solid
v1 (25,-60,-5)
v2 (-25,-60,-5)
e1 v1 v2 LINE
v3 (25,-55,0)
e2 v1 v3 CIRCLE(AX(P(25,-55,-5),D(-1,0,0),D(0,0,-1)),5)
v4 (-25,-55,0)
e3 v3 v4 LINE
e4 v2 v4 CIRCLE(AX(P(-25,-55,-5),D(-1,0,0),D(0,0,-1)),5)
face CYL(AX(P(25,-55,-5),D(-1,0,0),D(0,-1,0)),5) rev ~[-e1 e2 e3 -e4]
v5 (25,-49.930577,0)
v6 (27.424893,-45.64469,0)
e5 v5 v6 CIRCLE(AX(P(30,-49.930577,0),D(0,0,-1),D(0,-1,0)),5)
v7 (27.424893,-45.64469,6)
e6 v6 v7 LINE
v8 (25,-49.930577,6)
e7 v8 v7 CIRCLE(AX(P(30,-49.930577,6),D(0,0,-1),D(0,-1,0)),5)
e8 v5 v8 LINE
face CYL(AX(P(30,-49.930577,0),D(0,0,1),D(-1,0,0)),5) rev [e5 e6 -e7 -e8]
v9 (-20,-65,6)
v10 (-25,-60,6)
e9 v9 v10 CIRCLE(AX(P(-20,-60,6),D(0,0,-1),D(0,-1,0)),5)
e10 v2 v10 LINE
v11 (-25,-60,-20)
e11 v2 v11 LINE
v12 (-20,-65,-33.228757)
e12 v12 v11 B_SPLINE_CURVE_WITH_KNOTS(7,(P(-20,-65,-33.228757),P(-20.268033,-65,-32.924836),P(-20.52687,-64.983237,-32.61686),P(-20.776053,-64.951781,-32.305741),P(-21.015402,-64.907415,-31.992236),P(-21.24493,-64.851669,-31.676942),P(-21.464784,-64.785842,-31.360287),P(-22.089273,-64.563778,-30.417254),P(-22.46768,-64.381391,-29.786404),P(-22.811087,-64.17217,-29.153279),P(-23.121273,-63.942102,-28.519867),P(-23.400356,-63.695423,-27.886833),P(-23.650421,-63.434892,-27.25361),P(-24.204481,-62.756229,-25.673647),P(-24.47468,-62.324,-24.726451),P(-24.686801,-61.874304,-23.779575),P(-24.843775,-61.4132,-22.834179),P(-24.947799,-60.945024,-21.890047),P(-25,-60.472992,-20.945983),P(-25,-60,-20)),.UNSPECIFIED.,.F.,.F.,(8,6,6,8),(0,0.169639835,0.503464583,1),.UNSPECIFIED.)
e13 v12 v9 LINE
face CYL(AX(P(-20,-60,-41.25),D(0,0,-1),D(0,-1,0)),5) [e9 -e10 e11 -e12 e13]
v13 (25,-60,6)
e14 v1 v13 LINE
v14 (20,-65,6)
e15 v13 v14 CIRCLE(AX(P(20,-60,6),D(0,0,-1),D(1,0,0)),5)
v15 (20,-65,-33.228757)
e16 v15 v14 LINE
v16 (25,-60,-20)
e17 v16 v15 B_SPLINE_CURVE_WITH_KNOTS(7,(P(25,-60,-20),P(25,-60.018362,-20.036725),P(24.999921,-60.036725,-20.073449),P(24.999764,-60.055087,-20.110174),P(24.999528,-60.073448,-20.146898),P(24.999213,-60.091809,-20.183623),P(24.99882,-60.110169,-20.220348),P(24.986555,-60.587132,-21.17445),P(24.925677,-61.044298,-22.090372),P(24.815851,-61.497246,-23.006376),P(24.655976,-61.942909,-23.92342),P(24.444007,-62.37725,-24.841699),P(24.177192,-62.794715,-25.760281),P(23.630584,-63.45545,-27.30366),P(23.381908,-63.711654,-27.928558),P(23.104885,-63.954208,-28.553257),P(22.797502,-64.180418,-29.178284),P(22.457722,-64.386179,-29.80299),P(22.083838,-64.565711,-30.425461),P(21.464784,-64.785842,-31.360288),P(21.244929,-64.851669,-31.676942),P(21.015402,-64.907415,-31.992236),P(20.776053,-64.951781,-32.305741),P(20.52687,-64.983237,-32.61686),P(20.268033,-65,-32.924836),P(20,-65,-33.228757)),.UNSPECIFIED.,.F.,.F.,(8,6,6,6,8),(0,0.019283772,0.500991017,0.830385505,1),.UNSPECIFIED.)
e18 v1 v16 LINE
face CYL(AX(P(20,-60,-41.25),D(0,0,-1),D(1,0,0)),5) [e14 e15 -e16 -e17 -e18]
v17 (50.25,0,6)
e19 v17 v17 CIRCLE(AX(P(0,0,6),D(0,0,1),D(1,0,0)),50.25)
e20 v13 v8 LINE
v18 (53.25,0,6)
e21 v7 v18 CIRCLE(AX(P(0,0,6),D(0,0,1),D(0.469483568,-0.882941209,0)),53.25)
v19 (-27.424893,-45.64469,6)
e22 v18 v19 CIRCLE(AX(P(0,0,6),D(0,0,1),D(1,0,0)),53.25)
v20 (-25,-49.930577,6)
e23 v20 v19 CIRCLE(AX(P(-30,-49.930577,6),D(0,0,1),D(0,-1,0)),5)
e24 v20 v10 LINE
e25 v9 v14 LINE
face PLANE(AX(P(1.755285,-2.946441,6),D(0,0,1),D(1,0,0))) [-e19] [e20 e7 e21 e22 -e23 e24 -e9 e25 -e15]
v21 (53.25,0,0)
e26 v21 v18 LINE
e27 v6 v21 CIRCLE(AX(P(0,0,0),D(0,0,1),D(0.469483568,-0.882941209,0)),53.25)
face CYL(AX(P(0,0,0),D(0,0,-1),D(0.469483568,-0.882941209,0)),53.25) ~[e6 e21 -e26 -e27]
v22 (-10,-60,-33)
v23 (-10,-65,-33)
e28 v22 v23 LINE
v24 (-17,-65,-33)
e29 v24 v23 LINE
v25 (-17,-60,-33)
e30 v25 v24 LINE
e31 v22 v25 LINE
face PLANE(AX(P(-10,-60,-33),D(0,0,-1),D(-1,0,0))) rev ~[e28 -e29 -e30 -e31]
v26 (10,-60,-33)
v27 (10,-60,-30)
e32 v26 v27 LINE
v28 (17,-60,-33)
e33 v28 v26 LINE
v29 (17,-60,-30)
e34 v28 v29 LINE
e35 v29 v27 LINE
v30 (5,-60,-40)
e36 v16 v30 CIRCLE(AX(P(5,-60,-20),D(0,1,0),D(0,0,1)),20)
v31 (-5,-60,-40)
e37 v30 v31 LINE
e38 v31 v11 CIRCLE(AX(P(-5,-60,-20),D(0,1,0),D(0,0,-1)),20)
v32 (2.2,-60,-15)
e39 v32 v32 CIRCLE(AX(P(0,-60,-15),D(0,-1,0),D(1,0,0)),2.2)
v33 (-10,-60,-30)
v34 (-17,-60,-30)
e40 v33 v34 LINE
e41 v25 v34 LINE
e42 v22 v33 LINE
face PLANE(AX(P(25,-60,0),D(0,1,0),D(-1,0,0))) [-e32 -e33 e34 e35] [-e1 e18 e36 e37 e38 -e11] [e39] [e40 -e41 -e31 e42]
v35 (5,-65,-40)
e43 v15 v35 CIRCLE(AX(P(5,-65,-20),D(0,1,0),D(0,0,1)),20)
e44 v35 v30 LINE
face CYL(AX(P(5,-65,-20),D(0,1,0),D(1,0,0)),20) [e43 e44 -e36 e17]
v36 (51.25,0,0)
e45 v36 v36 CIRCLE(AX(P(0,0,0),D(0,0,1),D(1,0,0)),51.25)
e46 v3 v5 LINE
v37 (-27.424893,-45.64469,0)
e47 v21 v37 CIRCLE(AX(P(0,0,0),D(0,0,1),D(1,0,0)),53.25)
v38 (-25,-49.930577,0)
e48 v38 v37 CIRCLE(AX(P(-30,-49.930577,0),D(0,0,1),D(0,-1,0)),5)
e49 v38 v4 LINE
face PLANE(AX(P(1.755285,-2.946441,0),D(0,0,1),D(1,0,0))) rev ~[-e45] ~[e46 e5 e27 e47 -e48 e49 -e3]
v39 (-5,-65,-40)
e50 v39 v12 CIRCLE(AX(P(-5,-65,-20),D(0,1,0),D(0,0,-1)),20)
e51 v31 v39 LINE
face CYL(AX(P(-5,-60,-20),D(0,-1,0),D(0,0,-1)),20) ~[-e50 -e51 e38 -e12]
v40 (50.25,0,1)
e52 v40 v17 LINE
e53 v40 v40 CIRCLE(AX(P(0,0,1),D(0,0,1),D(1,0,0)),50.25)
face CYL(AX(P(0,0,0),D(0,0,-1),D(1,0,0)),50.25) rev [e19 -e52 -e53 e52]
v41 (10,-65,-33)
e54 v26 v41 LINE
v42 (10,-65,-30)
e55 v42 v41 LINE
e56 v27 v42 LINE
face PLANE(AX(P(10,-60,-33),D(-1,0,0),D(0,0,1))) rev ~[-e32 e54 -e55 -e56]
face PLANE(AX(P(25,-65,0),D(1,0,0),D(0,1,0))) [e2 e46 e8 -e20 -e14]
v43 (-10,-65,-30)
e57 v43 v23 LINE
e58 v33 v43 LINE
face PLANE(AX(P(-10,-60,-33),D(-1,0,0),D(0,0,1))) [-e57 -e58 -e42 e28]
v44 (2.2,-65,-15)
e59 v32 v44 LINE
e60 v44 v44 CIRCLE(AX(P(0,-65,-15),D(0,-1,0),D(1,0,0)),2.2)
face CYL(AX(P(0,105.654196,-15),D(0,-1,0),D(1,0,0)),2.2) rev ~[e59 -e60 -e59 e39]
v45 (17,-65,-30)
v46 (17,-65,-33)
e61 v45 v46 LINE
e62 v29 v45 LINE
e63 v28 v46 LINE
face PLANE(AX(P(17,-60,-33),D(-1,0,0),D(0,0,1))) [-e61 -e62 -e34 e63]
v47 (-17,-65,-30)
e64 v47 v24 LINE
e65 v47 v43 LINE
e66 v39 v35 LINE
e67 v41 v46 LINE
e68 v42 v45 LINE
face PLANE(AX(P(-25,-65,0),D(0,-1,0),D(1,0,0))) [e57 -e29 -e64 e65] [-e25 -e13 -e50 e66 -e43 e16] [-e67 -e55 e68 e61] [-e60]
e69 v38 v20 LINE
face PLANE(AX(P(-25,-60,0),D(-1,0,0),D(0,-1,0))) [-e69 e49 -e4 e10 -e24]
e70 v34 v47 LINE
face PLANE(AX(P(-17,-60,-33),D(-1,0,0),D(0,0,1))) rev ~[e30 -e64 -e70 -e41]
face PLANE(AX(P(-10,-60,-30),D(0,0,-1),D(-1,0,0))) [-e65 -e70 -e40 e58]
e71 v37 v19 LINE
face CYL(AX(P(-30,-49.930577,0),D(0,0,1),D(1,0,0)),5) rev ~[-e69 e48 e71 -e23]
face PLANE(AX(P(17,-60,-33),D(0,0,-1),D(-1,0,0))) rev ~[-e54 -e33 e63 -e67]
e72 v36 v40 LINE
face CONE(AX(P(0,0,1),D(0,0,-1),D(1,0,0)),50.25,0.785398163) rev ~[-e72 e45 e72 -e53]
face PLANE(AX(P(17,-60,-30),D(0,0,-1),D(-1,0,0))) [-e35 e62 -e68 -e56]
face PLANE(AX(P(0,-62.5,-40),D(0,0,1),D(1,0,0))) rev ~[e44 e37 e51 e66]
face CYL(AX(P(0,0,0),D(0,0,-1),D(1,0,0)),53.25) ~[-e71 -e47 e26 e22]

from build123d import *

# Parameters (mm, degrees)
F0_R        = 50.25
F1_DEPTH    = 6
F2_DEPTH    = 40
F4_D        = 4.4
F3_W        = 7
F3_H        = 3
F5_DEPTH    = 25
F6_R        = 5
F7_R        = 20
F8_T1_DEPTH = 59.75
F9_SIZE     = 1


# Not quite as in the source:
# - a fillet or chamfer that OpenCascade refuses, or shapes differently, is made with other operations: its cross-section is extruded or revolved along the edge and cut away or added


with BuildPart() as f1:
    # F0 (on Top) → F1 (new body)
    with BuildSketch(Plane.XY):
        with BuildLine():
            ThreePointArc((25, -47.0166194021), (45.6443452138, -27.4254671792), (53.25, 0))
            ThreePointArc((53.25, 0), (-27.4254671792, 45.6443452138), (-25, -47.0166194021))
            ThreePointArc((-25, -47.0166194021), (0, -53.25), (25, -47.0166194021))
        make_face()
        Circle(F0_R, mode=Mode.SUBTRACT)
        with BuildLine():
            ThreePointArc((25, -47.0166194021), (0, -53.25), (-25, -47.0166194021))
            Line((-25, -47.0166194021), (-25, -60))
            Line((-25, -60), (25, -60))
            Line((25, -60), (25, -47.0166194021))
        make_face()
        Polygon((25, -60), (-25, -60), (-25, -65), (0, -65), (25, -65), align=None)
    extrude(amount=F1_DEPTH)

    # F0 (on Top) → F2 (join)
    with BuildSketch(Plane.XY):
        Polygon((25, -60), (-25, -60), (-25, -65), (0, -65), (25, -65), align=None)
    extrude(amount=-F2_DEPTH)

    # F4 (through all)
    with Locations(Plane(origin=(0, -60, 0), x_dir=(-1, 0, 0), z_dir=(0, 1, 0))):
        with Locations((0, -15)):
            Hole(F4_D / 2)

    # F3 (on face) → F5 (cut)
    with BuildSketch(Plane(origin=(0, -60, 0), x_dir=(-1, 0, 0), z_dir=(0, 1, 0))):
        with Locations((-13.5, -31.5)):
            Rectangle(F3_W, F3_H)
        with Locations((13.5, -31.5)):
            Rectangle(F3_W, F3_H)
    extrude(amount=-F5_DEPTH, mode=Mode.SUBTRACT)

    # F6
    f6_edges = [f1.edges().sort_by_distance(p)[0] for p in [
        (-25, -47.016619, 3),
        (25, -47.016619, 3),
        (0, -60, 0),
    ]]
    fillet(f6_edges, radius=F6_R)

    # F7
    f7_edges = [f1.edges().sort_by_distance(p)[0] for p in [
        (25, -62.5, -40),
        (-25, -62.5, -40),
    ]]
    fillet(f7_edges, radius=F7_R)

    # F8: fillet of radius 5 on 2 edges, made by hand

    # F8_s2 → F8_t1 (cut)
    with BuildSketch(Plane.XY.offset(-41.25)):
        with BuildLine():
            ThreePointArc((25, -60), (23.5355339059, -63.5355339059), (20, -65))
            Line((20, -65), (25, -65))
            Line((25, -65), (25, -60))
        make_face()
        with BuildLine():
            ThreePointArc((-20, -65), (-23.5355339059, -63.5355339059), (-25, -60))
            Line((-25, -60), (-25, -65))
            Line((-25, -65), (-20, -65))
        make_face()
    extrude(amount=F8_T1_DEPTH, mode=Mode.SUBTRACT)

    # F9
    f9_edges = [f1.edges().sort_by_distance(p)[0] for p in [
        (-50.25, 0, 0),
    ]]
    chamfer(f9_edges, length=F9_SIZE)


solid = f1.part
